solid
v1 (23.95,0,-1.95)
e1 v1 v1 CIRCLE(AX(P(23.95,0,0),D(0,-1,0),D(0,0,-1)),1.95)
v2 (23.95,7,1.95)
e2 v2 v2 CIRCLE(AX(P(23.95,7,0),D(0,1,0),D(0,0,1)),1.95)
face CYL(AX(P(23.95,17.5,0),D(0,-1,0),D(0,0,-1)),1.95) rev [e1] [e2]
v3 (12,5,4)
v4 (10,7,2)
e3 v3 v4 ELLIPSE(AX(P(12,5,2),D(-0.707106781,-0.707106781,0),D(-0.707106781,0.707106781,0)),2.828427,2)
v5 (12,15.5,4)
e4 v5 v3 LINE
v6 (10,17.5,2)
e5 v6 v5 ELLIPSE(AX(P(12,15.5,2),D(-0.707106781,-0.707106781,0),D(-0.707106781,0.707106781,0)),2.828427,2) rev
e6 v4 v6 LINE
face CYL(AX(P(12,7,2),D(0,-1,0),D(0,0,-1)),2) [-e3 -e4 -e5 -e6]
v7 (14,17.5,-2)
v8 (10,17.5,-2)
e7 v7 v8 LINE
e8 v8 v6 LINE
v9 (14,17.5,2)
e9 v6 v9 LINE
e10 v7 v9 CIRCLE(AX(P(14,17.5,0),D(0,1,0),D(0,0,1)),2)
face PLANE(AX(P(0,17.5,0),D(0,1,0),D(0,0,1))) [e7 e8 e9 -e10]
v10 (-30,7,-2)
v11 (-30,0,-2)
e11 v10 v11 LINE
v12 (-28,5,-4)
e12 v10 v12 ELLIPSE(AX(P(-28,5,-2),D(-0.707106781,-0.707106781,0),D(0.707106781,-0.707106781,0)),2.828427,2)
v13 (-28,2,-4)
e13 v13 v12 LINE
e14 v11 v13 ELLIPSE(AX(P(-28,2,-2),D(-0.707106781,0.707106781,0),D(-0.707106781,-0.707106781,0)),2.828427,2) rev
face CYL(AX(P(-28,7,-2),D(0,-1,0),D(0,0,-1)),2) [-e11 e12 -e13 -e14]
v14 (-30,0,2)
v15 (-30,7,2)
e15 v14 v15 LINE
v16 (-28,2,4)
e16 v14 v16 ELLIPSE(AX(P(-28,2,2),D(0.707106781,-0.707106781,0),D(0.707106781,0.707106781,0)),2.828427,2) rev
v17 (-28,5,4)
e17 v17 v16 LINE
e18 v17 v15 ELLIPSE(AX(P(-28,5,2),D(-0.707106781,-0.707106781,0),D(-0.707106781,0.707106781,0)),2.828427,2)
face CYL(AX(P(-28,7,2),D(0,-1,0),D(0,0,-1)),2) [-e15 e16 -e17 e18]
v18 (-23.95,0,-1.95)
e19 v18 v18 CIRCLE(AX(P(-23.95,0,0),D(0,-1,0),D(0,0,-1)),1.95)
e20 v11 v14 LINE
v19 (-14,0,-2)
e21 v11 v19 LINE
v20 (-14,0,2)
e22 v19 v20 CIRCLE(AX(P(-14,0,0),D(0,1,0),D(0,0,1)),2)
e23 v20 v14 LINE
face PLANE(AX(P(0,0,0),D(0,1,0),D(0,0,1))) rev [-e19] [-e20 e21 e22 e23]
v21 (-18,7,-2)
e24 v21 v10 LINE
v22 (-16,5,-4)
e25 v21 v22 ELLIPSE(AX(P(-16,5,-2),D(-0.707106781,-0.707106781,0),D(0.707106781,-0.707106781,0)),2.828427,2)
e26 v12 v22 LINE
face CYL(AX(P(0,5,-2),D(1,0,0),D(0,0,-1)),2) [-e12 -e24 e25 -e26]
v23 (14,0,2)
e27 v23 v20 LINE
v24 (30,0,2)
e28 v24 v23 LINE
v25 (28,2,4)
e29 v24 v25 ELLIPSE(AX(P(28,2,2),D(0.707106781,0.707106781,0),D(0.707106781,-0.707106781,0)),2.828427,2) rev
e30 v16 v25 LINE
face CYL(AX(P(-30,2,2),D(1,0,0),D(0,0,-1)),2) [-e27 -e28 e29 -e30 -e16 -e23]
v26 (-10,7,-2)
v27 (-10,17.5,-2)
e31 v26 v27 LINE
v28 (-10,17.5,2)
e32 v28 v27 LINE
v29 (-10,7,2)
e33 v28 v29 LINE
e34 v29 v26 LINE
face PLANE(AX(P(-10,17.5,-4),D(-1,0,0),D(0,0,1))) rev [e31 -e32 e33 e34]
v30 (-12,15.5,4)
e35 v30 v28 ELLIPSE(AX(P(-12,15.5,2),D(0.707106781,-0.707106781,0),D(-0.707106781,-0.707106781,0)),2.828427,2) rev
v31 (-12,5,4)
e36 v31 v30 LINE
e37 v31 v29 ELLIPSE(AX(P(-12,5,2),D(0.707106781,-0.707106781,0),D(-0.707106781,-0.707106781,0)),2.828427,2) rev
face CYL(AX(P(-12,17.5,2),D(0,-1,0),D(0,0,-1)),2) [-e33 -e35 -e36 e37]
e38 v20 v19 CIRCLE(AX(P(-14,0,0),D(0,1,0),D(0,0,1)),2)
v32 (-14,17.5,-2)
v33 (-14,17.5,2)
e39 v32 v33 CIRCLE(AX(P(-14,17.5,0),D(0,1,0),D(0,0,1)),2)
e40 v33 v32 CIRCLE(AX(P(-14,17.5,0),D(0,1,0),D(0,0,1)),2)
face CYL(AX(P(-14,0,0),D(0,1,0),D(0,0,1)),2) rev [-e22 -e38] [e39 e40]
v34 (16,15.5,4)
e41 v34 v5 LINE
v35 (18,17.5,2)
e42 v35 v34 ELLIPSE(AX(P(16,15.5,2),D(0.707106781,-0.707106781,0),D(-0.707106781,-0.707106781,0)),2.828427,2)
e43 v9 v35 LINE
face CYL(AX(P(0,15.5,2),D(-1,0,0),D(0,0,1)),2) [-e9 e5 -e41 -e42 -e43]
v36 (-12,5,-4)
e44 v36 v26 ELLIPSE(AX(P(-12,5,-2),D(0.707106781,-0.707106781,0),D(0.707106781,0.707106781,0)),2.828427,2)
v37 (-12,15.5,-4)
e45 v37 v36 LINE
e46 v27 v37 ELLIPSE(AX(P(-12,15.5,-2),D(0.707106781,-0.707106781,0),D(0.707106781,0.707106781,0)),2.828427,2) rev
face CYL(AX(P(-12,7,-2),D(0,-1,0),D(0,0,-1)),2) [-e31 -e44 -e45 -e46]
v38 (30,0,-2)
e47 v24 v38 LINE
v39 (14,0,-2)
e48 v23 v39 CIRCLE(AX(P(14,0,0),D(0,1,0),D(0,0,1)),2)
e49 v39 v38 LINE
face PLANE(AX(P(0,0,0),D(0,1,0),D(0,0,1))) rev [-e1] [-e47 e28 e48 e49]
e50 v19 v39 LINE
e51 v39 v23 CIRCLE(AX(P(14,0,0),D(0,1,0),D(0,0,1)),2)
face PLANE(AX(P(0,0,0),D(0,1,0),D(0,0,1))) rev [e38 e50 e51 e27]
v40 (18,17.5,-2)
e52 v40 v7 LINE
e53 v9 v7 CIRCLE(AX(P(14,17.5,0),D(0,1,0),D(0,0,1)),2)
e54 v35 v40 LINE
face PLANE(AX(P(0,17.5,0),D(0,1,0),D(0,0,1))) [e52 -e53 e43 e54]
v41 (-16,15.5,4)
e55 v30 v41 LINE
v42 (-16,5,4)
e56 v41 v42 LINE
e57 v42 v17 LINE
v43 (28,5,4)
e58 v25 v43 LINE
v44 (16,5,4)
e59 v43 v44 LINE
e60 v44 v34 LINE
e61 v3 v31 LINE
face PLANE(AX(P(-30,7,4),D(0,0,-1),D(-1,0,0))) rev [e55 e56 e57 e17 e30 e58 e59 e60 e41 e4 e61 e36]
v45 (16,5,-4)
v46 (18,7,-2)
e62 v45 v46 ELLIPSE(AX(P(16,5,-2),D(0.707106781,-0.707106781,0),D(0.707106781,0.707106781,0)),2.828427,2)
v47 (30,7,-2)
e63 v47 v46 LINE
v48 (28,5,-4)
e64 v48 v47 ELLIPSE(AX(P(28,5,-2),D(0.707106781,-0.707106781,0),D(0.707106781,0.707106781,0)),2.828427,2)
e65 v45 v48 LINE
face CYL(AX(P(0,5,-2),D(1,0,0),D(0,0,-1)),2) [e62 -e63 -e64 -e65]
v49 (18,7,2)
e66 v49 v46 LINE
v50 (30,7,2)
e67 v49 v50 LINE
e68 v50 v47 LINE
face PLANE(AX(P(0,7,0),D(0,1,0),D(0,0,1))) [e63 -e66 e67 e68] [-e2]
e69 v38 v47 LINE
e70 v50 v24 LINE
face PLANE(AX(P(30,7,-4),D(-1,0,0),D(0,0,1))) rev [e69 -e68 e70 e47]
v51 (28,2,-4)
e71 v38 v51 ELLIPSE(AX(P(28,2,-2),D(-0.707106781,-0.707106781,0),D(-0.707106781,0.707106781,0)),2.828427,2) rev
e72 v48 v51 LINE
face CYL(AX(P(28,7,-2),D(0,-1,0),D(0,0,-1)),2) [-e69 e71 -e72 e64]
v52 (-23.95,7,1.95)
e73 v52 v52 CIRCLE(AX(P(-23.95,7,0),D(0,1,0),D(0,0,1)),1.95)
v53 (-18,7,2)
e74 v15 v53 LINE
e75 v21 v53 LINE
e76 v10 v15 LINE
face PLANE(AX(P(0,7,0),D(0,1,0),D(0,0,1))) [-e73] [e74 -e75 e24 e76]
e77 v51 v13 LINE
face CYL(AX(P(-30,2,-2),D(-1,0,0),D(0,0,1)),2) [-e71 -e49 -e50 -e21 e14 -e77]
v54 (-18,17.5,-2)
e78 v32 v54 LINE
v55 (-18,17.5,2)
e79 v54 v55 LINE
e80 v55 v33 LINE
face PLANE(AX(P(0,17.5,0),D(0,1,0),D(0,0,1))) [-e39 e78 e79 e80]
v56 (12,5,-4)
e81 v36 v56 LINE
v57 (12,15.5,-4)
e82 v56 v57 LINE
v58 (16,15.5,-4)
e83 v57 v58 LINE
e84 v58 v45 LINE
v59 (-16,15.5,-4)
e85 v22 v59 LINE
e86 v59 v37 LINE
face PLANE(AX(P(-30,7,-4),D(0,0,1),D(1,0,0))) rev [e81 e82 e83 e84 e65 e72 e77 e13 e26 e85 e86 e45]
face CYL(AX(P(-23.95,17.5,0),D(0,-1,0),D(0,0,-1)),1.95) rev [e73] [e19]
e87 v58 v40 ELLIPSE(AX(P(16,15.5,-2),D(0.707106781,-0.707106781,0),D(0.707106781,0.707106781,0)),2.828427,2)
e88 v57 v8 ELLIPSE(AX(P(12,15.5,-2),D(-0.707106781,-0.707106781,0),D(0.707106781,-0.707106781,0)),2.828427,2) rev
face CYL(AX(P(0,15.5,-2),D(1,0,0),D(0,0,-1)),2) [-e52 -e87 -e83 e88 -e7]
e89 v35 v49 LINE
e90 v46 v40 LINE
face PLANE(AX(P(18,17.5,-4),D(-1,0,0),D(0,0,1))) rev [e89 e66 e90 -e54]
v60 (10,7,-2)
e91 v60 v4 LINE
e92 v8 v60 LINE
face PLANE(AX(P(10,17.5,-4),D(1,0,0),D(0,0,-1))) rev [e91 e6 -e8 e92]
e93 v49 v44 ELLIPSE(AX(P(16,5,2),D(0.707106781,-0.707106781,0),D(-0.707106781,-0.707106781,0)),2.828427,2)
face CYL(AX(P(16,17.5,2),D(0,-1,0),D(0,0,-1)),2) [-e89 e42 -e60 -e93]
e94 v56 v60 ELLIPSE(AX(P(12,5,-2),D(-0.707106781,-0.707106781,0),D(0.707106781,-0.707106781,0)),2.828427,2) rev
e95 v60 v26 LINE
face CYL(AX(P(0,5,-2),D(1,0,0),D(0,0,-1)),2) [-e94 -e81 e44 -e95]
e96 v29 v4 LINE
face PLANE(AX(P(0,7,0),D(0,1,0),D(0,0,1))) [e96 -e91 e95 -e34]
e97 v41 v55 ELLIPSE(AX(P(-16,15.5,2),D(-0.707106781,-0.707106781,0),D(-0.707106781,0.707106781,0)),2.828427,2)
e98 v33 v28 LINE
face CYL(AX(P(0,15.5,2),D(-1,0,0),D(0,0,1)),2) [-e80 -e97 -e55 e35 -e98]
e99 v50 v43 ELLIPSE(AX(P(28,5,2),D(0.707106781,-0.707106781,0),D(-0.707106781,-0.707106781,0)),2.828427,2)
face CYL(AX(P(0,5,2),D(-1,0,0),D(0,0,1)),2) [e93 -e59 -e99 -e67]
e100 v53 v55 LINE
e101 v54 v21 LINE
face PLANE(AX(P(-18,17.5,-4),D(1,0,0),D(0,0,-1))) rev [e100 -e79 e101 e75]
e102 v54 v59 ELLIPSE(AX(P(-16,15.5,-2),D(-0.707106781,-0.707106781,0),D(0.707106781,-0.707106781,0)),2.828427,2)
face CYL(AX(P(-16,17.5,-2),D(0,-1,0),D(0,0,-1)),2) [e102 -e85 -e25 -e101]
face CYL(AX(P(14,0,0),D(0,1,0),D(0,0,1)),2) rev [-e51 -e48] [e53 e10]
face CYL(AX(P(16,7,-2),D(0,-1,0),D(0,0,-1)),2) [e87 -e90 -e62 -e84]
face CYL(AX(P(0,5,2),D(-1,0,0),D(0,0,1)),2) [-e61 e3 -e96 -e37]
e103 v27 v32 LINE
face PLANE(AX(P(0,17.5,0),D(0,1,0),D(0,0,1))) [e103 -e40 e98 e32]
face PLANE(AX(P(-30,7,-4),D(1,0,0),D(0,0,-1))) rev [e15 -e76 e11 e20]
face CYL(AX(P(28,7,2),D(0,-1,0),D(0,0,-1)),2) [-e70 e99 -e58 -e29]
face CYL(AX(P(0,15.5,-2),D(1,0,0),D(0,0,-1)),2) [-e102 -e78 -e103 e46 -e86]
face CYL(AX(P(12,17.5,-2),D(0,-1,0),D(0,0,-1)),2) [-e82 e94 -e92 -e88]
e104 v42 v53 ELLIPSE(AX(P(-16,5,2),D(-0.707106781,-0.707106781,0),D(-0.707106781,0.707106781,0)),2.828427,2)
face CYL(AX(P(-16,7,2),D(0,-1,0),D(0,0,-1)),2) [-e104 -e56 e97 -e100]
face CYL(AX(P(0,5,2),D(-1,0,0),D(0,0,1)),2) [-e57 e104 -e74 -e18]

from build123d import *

# Parameters (mm, degrees)
SKETCH1_W           = 60
SKETCH1_H           = 8
BOSS_EXTRUDE1_DEPTH = 7
SKETCH2_W           = 8
SKETCH2_H           = 8
BOSS_EXTRUDE2_DEPTH = 10.5
SKETCH3_R           = 2
CUT_EXTRUDE1_DEPTH  = 35.960692213
SKETCH5_R           = 1.95
CUT_EXTRUDE2_DEPTH  = 35.960692213
FILLET1_R           = 2


with BuildPart() as part:
    # Sketch1 → Boss-Extrude1 (new body)
    with BuildSketch(Plane(origin=(0, 0, 0), x_dir=(1, 0, 0), z_dir=(0, 1, 0))):
        Rectangle(SKETCH1_W, SKETCH1_H)
    extrude(amount=BOSS_EXTRUDE1_DEPTH)

    # Sketch2 → Boss-Extrude2 (add)
    with BuildSketch(Plane(origin=(0, 7, 0), x_dir=(1, 0, 0), z_dir=(0, 1, 0))):
        with Locations((-14, 0)):
            Rectangle(SKETCH2_W, SKETCH2_H)
        with Locations((14, 0)):
            Rectangle(SKETCH2_W, SKETCH2_H)
    extrude(amount=BOSS_EXTRUDE2_DEPTH)

    # Sketch3 → Cut-Extrude1 (cut, through all)
    with BuildSketch(Plane(origin=(0, 17.5, 0), x_dir=(1, 0, 0), z_dir=(0, 1, 0))):
        with Locations((-14, 0)):
            Circle(SKETCH3_R)
        with Locations((14, 0)):
            Circle(SKETCH3_R)
    extrude(amount=-CUT_EXTRUDE1_DEPTH, mode=Mode.SUBTRACT)

    # Sketch5 → Cut-Extrude2 (cut, through all)
    with BuildSketch(Plane.XZ):
        with Locations((-23.95, 0)):
            Circle(SKETCH5_R)
        with Locations((23.95, 0)):
            Circle(SKETCH5_R)
    extrude(amount=-CUT_EXTRUDE2_DEPTH, mode=Mode.SUBTRACT)

    # Fillet1
    fillet1_edges = [part.edges().sort_by_distance(p)[0] for p in [
        (30, 3.5, -4),
        (24, 7, -4),
        (18, 12.25, -4),
        (14, 17.5, -4),
        (10, 12.25, -4),
        (0, 7, -4),
        (-10, 12.25, -4),
        (-14, 17.5, -4),
        (-18, 12.25, -4),
        (-24, 7, -4),
        (-30, 3.5, -4),
        (0, 0, -4),
        (-30, 3.5, 4),
        (-24, 7, 4),
        (-18, 12.25, 4),
        (-14, 17.5, 4),
        (-10, 12.25, 4),
        (0, 7, 4),
        (10, 12.25, 4),
        (14, 17.5, 4),
        (18, 12.25, 4),
        (24, 7, 4),
        (30, 3.5, 4),
        (0, 0, 4),
    ]]
    fillet(fillet1_edges, radius=FILLET1_R)


solid = part.part
